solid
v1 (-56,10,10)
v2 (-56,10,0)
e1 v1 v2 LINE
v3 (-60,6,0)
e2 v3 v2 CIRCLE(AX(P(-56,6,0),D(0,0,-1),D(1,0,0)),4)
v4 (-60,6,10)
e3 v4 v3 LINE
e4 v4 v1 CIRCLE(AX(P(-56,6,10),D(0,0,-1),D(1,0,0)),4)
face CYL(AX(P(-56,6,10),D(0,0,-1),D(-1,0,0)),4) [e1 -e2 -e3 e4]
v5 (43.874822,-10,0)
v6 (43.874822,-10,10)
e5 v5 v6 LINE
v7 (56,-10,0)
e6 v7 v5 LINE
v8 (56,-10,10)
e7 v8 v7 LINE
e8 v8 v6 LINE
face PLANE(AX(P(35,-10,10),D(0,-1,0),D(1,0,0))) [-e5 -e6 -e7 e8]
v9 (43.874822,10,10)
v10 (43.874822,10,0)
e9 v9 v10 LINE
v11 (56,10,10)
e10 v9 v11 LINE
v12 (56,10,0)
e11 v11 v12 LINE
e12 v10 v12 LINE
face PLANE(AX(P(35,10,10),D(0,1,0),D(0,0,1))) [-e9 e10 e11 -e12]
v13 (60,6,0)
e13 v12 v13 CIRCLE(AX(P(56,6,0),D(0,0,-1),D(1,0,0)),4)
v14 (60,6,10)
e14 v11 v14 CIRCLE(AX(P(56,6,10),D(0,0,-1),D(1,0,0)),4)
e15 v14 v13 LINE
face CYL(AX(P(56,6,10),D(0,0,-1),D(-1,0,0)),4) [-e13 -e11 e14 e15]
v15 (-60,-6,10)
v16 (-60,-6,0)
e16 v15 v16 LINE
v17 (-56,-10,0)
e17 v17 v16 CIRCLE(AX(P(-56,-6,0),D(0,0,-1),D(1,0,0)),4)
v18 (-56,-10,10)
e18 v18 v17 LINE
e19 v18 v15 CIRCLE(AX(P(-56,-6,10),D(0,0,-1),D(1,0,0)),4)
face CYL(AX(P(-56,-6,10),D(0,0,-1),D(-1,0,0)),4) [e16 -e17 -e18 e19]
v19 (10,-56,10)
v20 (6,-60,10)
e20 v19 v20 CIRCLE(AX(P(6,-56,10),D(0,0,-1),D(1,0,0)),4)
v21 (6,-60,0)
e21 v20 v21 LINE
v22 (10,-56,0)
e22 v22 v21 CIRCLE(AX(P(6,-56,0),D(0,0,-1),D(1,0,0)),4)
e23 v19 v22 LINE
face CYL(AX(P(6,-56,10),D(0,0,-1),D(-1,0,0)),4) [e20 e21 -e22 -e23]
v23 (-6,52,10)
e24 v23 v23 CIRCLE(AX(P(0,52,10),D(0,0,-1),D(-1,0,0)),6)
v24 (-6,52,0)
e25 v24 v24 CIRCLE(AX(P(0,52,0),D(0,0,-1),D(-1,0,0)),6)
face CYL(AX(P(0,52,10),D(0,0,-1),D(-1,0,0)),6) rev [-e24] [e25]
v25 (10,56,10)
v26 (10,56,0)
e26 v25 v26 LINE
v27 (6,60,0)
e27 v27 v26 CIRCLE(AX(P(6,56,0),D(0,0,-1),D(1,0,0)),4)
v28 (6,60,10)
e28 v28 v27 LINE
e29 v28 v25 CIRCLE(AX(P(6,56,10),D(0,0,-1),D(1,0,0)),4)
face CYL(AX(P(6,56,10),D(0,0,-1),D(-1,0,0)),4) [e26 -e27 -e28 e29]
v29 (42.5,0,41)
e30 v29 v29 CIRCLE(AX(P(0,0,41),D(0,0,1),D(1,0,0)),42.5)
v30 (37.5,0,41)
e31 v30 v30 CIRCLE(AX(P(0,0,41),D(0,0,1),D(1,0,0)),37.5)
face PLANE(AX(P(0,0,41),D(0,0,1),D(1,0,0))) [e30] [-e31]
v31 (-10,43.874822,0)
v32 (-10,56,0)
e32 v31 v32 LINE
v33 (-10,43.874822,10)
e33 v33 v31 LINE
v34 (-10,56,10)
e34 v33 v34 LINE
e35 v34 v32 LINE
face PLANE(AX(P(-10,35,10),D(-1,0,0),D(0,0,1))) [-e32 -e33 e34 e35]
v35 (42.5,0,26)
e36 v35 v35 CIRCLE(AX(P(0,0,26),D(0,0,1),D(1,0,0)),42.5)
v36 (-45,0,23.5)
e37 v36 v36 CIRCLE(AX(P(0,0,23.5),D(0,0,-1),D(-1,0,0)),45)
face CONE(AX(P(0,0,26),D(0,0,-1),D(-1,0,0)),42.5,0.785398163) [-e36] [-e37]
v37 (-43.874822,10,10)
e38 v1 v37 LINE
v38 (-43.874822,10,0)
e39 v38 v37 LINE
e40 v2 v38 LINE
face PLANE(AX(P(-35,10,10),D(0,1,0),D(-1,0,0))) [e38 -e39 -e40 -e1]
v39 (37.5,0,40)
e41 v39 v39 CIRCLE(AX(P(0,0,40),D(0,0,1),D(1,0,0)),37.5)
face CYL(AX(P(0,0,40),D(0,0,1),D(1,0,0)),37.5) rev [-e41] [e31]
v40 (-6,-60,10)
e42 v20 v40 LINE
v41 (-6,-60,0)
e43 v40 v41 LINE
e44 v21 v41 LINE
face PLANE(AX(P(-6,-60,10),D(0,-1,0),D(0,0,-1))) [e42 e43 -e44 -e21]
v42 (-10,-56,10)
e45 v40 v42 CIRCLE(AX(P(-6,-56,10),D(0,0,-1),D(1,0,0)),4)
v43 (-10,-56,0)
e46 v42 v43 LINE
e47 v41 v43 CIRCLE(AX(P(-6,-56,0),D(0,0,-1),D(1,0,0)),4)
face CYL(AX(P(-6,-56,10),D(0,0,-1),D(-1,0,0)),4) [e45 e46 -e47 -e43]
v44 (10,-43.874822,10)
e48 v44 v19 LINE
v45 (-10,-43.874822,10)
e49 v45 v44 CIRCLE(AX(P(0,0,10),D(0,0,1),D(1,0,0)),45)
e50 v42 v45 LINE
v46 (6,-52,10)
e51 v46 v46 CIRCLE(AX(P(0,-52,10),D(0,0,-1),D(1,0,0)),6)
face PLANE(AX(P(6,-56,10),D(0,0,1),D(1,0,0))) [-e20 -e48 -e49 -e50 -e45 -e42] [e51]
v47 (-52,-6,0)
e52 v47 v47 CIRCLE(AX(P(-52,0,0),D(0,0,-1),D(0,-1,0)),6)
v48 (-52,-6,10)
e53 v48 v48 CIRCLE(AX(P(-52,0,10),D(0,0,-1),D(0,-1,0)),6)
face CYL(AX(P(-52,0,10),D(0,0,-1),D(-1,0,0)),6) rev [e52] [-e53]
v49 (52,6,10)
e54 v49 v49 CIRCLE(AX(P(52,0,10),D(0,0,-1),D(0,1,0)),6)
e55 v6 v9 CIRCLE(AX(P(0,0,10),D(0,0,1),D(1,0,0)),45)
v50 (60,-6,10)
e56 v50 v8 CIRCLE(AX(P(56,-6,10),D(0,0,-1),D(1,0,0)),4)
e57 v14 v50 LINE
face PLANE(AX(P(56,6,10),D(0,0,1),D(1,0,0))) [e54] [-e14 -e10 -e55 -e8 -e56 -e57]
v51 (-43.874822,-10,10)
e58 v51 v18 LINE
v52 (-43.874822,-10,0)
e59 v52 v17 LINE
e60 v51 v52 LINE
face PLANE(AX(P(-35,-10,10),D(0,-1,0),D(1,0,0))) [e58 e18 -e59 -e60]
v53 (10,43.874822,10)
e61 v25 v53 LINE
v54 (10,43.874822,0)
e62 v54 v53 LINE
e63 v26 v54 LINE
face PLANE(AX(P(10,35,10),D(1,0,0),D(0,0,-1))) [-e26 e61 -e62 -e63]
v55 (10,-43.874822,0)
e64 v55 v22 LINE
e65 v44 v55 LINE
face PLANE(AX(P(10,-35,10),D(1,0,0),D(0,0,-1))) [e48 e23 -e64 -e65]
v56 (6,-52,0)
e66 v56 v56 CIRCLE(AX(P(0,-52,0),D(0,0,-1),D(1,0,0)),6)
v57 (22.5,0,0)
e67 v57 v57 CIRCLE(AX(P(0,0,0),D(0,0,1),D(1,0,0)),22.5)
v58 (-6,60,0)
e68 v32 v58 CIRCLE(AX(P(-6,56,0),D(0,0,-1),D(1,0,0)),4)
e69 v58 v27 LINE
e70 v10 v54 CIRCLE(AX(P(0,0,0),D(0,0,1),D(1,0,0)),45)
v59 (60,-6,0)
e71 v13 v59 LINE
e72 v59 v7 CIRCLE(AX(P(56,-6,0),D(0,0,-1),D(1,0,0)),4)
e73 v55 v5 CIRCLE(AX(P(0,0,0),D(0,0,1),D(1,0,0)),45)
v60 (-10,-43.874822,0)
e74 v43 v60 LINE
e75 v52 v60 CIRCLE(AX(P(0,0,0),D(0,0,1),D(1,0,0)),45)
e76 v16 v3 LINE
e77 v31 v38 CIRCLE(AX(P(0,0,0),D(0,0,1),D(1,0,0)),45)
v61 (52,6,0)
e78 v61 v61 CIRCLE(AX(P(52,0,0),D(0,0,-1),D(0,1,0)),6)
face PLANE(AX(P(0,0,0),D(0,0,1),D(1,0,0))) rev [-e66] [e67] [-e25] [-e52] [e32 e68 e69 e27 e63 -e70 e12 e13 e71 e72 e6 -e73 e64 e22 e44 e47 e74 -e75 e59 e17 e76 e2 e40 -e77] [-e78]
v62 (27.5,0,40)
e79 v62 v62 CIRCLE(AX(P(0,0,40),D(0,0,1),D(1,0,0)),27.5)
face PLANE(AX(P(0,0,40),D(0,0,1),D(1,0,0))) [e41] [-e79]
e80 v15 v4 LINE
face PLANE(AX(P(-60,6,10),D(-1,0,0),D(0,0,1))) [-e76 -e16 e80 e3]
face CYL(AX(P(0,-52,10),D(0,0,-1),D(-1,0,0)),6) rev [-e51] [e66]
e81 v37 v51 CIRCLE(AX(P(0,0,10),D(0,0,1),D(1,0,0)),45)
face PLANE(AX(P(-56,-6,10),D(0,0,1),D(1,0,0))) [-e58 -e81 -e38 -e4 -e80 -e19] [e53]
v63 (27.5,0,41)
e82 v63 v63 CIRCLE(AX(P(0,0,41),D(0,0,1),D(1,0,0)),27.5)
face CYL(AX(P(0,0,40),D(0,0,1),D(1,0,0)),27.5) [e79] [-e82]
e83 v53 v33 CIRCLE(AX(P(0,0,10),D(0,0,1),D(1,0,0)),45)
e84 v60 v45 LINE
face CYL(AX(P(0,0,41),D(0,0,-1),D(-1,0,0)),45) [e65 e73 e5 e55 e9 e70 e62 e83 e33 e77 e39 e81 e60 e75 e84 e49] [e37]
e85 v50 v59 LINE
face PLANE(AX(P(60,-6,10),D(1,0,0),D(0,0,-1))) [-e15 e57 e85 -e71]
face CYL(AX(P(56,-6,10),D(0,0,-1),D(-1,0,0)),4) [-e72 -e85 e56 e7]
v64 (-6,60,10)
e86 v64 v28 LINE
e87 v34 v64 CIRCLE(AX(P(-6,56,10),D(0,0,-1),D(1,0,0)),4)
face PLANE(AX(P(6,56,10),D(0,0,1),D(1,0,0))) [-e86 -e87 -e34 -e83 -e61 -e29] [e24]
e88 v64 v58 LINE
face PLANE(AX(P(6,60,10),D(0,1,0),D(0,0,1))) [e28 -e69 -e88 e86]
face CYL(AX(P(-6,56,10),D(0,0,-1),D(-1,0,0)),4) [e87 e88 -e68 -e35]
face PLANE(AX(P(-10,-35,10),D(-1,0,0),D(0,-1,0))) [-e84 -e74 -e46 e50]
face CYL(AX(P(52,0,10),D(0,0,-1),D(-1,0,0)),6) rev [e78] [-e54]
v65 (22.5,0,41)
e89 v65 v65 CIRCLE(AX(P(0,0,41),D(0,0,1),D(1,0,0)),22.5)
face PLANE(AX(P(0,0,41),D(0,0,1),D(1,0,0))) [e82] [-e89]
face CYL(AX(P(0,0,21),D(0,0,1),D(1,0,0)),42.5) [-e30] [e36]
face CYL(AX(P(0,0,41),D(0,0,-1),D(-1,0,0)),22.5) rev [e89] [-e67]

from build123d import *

# Parameters (mm, degrees)
SZKIC1_R                    = 45
SZKIC1_R_2                  = 22.5
DODANIE_WYCI_GNI_CIE1_DEPTH = 41
DODANIE_WYCI_GNI_CIE2_DEPTH = 10
SZKIC3_R                    = 6
WYTNIJ_WYCI_GNI_CIE1_DEPTH  = 10
SZYK_KO_OWY1_COUNT          = 4
WYTNIJ_WYCI_GNI_CIE2_START  = -20
SZKIC5_R                    = 45
SZKIC5_R_2                  = 42.5
WYTNIJ_WYCI_GNI_CIE2_DEPTH  = 20
SZKIC6_R                    = 37.5
SZKIC6_R_2                  = 27.5
WYTNIJ_WYCI_GNI_CIE3_DEPTH  = 1
SFAZOWANIE1_SIZE            = 5


with BuildPart() as part:
    # Szkic1 → Dodanie-wyciągnięcie1 (new body)
    with BuildSketch(Plane.XY):
        Circle(SZKIC1_R)
        Circle(SZKIC1_R_2, mode=Mode.SUBTRACT)
    extrude(amount=DODANIE_WYCI_GNI_CIE1_DEPTH)

    # Szkic2 → Dodanie-wyciągnięcie2 (add)
    with BuildSketch(Plane(origin=(0, 0, 0), x_dir=(-1, 0, 0), z_dir=(0, 0, -1))):
        with BuildLine():
            Line((35, 10), (56, 10))
            ThreePointArc((56, 10), (58.828427125, 8.828427125), (60, 6))
            Line((60, 6), (60, -6))
            ThreePointArc((60, -6), (58.828427125, -8.828427125), (56, -10))
            Line((56, -10), (35, -10))
            Line((35, -10), (35, 10))
        make_face()
        with BuildLine():
            Line((-10, 35), (10, 35))
            Line((10, 35), (10, 56))
            ThreePointArc((10, 56), (8.828427125, 58.828427125), (6, 60))
            Line((6, 60), (-6, 60))
            ThreePointArc((-6, 60), (-8.828427125, 58.828427125), (-10, 56))
            Line((-10, 56), (-10, 35))
        make_face()
        with BuildLine():
            Line((10, -35), (10, -56))
            ThreePointArc((10, -56), (8.828427125, -58.828427125), (6, -60))
            Line((6, -60), (-6, -60))
            ThreePointArc((-6, -60), (-8.828427125, -58.828427125), (-10, -56))
            Line((-10, -56), (-10, -35))
            Line((-10, -35), (10, -35))
        make_face()
        with BuildLine():
            Line((-35, -10), (-56, -10))
            ThreePointArc((-56, -10), (-58.828427125, -8.828427125), (-60, -6))
            Line((-60, -6), (-60, 6))
            ThreePointArc((-60, 6), (-58.828427125, 8.828427125), (-56, 10))
            Line((-56, 10), (-35, 10))
            Line((-35, 10), (-35, -10))
        make_face()
    extrude(amount=-DODANIE_WYCI_GNI_CIE2_DEPTH)

    # Szkic3 → Wytnij-wyciągnięcie1 (cut)
    with BuildSketch(Plane(origin=(0, 0, 0), x_dir=(-1, 0, 0), z_dir=(0, 0, -1))):
        with Locations((0, 52)):
            Circle(SZKIC3_R)
    wytnij_wyci_gni_cie1 = extrude(amount=-WYTNIJ_WYCI_GNI_CIE1_DEPTH, mode=Mode.SUBTRACT)

    # Szyk kołowy1: Wytnij-wyciągnięcie1 ×4 about axis
    szyk_ko_owy1_axis = Axis((0, 0, 0), (0, 0, 1))
    for i in range(1, SZYK_KO_OWY1_COUNT):
        add(wytnij_wyci_gni_cie1.rotate(szyk_ko_owy1_axis, i * 360 / SZYK_KO_OWY1_COUNT), mode=Mode.SUBTRACT)

    # Szkic5 → Wytnij-wyciągnięcie2 (cut)
    with BuildSketch(Plane.XY.offset(41).offset(WYTNIJ_WYCI_GNI_CIE2_START)):
        with Locations(Location((0, 0, 0), (0, 0, 167.160411593))):
            Circle(SZKIC5_R)
        Circle(SZKIC5_R_2, mode=Mode.SUBTRACT)
    extrude(amount=WYTNIJ_WYCI_GNI_CIE2_DEPTH, mode=Mode.SUBTRACT)

    # Szkic6 → Wytnij-wyciągnięcie3 (cut)
    with BuildSketch(Plane.XY.offset(41)):
        Circle(SZKIC6_R)
        Circle(SZKIC6_R_2, mode=Mode.SUBTRACT)
    extrude(amount=-WYTNIJ_WYCI_GNI_CIE3_DEPTH, mode=Mode.SUBTRACT)

    # Sfazowanie1
    # the kernel refuses this chamfer: 5 mm, written as the material it adds along each edge
    with BuildSketch(Plane(origin=(0, 0, 21), x_dir=(1, 0, 0), z_dir=(0, -1, 0))) as sfazowanie1_piece_1_section:
        Polygon((42.5 + SFAZOWANIE1_SIZE, 0), (42.5, SFAZOWANIE1_SIZE), (42.5, 0), align=None)
    sfazowanie1_piece_1 = revolve(axis=Axis((0, 0, 21), (0, 0, 1)), mode=Mode.PRIVATE)
    sfazowanie1_piece_1 = sfazowanie1_piece_1 & Plane(origin=(0, 0, 24.721078182), x_dir=(1, 0, 0), z_dir=(0, 0, -1)) * Cylinder(45, 190, mode=Mode.PRIVATE)
    add(sfazowanie1_piece_1)


solid = part.part
